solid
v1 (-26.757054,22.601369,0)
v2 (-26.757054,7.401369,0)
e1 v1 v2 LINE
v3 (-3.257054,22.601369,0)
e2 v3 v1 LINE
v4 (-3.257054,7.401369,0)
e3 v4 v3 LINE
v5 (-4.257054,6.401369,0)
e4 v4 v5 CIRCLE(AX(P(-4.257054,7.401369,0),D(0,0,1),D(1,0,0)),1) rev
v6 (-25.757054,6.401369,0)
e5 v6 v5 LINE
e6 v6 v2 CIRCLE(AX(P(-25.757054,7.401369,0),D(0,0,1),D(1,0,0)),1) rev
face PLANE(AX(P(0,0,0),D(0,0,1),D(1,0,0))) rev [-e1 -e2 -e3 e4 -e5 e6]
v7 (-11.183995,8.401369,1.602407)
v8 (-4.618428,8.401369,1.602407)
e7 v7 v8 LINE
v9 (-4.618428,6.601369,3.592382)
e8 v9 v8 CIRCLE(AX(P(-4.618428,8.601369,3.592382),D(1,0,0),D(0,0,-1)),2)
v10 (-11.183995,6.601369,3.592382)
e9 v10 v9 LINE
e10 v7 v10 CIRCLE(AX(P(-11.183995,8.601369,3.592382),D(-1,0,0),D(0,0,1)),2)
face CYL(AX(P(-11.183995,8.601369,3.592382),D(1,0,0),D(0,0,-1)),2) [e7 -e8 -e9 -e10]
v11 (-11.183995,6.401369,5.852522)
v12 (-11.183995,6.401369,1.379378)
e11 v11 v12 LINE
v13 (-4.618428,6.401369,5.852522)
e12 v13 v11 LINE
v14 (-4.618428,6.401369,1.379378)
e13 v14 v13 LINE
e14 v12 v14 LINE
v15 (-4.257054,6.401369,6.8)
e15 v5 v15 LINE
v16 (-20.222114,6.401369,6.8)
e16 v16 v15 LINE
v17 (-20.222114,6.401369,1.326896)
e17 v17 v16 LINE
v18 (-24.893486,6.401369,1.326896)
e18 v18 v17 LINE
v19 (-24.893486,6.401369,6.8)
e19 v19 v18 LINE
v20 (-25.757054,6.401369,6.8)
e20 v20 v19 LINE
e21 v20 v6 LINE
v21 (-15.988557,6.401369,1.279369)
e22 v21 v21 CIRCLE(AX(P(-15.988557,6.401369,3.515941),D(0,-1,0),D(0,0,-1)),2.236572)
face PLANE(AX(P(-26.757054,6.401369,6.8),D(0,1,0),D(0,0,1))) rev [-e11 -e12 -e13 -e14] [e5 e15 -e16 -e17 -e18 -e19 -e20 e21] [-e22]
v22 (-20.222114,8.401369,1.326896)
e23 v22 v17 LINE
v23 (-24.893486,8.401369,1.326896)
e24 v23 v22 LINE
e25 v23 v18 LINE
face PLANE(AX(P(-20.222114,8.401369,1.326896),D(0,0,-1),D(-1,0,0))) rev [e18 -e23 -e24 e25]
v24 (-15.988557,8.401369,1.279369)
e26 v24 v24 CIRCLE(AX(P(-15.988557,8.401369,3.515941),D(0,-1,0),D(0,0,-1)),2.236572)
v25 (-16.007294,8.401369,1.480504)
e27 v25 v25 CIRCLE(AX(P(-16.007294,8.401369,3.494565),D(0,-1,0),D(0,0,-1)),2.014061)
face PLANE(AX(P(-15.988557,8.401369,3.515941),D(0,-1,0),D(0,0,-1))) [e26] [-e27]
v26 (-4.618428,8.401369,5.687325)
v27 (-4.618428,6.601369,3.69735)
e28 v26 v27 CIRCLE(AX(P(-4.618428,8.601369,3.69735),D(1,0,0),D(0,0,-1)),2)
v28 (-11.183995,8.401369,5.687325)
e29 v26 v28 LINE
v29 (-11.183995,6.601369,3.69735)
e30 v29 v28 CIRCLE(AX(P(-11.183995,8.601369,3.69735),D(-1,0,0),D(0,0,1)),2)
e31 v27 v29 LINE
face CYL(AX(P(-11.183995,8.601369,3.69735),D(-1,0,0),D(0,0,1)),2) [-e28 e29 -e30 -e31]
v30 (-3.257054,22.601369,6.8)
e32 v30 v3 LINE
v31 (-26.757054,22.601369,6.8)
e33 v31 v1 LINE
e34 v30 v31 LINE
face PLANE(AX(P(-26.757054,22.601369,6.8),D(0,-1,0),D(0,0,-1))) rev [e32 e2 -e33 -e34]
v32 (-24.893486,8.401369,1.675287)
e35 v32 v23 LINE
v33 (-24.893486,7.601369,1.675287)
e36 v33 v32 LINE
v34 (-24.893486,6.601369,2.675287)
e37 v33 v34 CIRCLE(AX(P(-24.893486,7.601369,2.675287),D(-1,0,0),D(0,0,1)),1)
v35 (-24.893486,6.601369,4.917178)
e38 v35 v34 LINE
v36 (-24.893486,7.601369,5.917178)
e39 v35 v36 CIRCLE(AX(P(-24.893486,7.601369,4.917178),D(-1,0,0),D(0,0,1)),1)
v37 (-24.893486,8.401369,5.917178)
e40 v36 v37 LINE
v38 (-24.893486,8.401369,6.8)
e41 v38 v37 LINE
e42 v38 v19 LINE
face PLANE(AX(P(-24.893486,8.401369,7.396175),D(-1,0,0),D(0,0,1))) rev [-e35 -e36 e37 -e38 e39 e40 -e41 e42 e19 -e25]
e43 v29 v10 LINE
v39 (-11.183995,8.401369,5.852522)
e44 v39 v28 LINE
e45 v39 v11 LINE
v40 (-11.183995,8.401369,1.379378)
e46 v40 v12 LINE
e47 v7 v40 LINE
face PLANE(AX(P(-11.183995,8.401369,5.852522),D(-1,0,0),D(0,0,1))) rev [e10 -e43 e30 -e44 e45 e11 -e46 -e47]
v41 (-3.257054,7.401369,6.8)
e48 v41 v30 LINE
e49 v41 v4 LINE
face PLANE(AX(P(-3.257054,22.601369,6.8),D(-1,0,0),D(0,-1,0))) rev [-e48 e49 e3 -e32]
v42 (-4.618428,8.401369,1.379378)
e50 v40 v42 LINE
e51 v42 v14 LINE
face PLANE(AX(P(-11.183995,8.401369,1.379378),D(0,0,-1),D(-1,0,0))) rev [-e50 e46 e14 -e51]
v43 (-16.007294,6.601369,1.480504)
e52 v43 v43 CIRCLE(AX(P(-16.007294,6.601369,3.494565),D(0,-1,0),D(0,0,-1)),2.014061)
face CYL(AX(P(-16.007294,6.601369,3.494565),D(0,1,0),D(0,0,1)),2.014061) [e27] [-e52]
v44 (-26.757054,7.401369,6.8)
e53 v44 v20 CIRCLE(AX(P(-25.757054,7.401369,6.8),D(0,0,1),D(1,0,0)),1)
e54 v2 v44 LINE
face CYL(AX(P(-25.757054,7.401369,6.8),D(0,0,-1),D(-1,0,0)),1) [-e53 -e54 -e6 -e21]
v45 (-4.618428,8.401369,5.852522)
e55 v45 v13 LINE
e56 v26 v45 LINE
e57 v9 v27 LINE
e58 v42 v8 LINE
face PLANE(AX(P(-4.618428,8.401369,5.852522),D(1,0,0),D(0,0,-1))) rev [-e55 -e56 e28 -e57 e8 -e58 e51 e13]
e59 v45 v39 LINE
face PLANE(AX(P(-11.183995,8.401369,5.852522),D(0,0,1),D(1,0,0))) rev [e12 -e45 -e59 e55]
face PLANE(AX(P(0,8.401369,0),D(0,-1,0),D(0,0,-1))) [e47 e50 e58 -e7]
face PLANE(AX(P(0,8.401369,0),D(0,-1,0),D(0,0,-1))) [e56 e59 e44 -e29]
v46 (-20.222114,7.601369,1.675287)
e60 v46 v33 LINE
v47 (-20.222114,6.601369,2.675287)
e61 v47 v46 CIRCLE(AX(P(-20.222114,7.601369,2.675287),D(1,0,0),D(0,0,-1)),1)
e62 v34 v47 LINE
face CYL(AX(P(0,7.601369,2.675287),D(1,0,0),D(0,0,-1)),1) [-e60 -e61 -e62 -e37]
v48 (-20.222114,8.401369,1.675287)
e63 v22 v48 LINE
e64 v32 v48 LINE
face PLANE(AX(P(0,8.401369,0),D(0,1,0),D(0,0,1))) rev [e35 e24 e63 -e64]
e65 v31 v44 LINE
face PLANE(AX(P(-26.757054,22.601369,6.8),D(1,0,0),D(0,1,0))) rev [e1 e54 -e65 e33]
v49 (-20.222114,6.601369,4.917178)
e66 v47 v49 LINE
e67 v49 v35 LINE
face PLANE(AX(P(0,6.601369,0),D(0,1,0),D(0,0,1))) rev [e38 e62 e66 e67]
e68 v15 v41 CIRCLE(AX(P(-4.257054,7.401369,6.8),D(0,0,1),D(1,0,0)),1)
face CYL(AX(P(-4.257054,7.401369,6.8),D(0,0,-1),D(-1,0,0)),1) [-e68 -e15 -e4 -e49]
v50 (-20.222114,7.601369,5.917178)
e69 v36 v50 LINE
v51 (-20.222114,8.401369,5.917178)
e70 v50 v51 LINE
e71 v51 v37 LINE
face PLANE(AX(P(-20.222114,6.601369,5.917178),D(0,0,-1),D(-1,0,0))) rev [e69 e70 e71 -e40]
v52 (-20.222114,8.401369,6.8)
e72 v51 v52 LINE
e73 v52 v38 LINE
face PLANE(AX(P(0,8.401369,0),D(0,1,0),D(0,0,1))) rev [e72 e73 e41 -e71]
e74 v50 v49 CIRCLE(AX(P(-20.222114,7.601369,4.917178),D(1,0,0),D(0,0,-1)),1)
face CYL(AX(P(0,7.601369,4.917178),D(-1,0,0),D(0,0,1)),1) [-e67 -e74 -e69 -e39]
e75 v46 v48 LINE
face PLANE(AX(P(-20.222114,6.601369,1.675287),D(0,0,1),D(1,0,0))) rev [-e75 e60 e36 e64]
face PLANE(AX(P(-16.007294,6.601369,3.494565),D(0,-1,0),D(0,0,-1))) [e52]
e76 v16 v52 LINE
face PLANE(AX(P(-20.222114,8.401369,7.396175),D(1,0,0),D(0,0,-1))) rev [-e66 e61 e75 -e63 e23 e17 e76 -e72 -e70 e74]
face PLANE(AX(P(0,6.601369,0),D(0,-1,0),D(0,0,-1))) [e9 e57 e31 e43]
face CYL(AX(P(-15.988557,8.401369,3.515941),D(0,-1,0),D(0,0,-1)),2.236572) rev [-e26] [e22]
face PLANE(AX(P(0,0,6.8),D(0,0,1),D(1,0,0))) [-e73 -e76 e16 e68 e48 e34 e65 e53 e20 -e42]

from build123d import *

# Parameters (mm, degrees)
SKETCH1_W           = 23.5
SKETCH1_H           = 16.2
BOSS_EXTRUDE1_DEPTH = 6.8
FILLET1_R           = 1
SKETCH2_R           = 2.236571794
SKETCH2_W           = 6.565566979
SKETCH2_H           = 4.473143588
SKETCH2_W_2         = 4.671371309
SKETCH2_H_2         = 6.069279627
CUT_EXTRUDE1_DEPTH  = 2
SKETCH3_W           = 4.671371309
SKETCH3_H           = 4.241891526
SKETCH3_W_2         = 6.565566979
SKETCH3_H_2         = 4.084917802
BOSS_EXTRUDE2_DEPTH = 1.8
FILLET2_R           = 1
FILLET3_R           = 2
SKETCH4_R           = 2.01406143
BOSS_EXTRUDE3_DEPTH = 1.8


with BuildPart() as part:
    # Sketch1 → Boss-Extrude1 (new body)
    with BuildSketch(Plane.XY):
        with Locations((-15.007054392, 14.50136894)):
            Rectangle(SKETCH1_W, SKETCH1_H)
    extrude(amount=BOSS_EXTRUDE1_DEPTH)

    # Fillet1
    fillet1_edges = [part.edges().sort_by_distance(p)[0] for p in [
        (-3.257054392, 6.40136894, 3.4),
        (-26.757054392, 6.40136894, 3.4),
    ]]
    fillet(fillet1_edges, radius=FILLET1_R)

    # Sketch2 → Cut-Extrude1 (cut)
    with BuildSketch(Plane.XZ.offset(-6.40136894)):
        with Locations(Location((-15.988556768, 3.515941097, 0), (0, 0, 270))):
            Circle(SKETCH2_R)
        with Locations((-7.901211447, 3.615950214)):
            Rectangle(SKETCH2_W, SKETCH2_H)
        with Locations((-22.557799993, 4.361535506)):
            Rectangle(SKETCH2_W_2, SKETCH2_H_2)
    extrude(amount=-CUT_EXTRUDE1_DEPTH, mode=Mode.SUBTRACT)

    # Sketch3 → Boss-Extrude2 (add)
    with BuildSketch(Plane(origin=(0, 8.40136894, 0), x_dir=(-1, 0, 0), z_dir=(0, -1, 0))):
        with Locations((22.557799993, -3.796232689)):
            Rectangle(SKETCH3_W, SKETCH3_H)
        with Locations((7.901211447, -3.644866315)):
            Rectangle(SKETCH3_W_2, SKETCH3_H_2)
    extrude(amount=BOSS_EXTRUDE2_DEPTH)

    # Fillet2
    fillet2_edges = [part.edges().sort_by_distance(p)[0] for p in [
        (-22.557799992, 6.60136894, 5.917178452),
        (-22.557799992, 6.60136894, 1.675286926),
    ]]
    fillet(fillet2_edges, radius=FILLET2_R)

    # Fillet3
    # the kernel refuses this fillet: 2 mm, written as the material it takes off along each edge
    with BuildSketch(Plane(origin=(-11.183994936, 6.60136894, 5.687325216), x_dir=(0, 1, 0), z_dir=(1, 0, 0))) as fillet3_piece_1:
        with BuildLine():
            CenterArc((2, -1.989974874), FILLET3_R, 95.739170477, 84.260829523)
            Line((0, -1.989974874), (0, 0))
            Line((0, 0), (1.8, 0))
        make_face()
    extrude(amount=6.565566979, mode=Mode.SUBTRACT)
    with BuildSketch(Plane(origin=(-4.618427957, 6.60136894, 1.602407414), x_dir=(0, 0, 1), z_dir=(-1, 0, 0))) as fillet3_piece_2:
        with BuildLine():
            CenterArc((1.989974874, 2), FILLET3_R, 185.739170477, 84.260829523)
            Line((0, 1.8), (0, 0))
            Line((0, 0), (1.989974874, 0))
        make_face()
    extrude(amount=6.565566979, mode=Mode.SUBTRACT)

    # Sketch4 → Boss-Extrude3 (add)
    with BuildSketch(Plane(origin=(0, 8.40136894, 0), x_dir=(-1, 0, 0), z_dir=(0, -1, 0))):
        with Locations(Location((16.007293958, -3.494565095, 0), (0, 0, 90))):
            Circle(SKETCH4_R)
    extrude(amount=BOSS_EXTRUDE3_DEPTH)


solid = part.part
